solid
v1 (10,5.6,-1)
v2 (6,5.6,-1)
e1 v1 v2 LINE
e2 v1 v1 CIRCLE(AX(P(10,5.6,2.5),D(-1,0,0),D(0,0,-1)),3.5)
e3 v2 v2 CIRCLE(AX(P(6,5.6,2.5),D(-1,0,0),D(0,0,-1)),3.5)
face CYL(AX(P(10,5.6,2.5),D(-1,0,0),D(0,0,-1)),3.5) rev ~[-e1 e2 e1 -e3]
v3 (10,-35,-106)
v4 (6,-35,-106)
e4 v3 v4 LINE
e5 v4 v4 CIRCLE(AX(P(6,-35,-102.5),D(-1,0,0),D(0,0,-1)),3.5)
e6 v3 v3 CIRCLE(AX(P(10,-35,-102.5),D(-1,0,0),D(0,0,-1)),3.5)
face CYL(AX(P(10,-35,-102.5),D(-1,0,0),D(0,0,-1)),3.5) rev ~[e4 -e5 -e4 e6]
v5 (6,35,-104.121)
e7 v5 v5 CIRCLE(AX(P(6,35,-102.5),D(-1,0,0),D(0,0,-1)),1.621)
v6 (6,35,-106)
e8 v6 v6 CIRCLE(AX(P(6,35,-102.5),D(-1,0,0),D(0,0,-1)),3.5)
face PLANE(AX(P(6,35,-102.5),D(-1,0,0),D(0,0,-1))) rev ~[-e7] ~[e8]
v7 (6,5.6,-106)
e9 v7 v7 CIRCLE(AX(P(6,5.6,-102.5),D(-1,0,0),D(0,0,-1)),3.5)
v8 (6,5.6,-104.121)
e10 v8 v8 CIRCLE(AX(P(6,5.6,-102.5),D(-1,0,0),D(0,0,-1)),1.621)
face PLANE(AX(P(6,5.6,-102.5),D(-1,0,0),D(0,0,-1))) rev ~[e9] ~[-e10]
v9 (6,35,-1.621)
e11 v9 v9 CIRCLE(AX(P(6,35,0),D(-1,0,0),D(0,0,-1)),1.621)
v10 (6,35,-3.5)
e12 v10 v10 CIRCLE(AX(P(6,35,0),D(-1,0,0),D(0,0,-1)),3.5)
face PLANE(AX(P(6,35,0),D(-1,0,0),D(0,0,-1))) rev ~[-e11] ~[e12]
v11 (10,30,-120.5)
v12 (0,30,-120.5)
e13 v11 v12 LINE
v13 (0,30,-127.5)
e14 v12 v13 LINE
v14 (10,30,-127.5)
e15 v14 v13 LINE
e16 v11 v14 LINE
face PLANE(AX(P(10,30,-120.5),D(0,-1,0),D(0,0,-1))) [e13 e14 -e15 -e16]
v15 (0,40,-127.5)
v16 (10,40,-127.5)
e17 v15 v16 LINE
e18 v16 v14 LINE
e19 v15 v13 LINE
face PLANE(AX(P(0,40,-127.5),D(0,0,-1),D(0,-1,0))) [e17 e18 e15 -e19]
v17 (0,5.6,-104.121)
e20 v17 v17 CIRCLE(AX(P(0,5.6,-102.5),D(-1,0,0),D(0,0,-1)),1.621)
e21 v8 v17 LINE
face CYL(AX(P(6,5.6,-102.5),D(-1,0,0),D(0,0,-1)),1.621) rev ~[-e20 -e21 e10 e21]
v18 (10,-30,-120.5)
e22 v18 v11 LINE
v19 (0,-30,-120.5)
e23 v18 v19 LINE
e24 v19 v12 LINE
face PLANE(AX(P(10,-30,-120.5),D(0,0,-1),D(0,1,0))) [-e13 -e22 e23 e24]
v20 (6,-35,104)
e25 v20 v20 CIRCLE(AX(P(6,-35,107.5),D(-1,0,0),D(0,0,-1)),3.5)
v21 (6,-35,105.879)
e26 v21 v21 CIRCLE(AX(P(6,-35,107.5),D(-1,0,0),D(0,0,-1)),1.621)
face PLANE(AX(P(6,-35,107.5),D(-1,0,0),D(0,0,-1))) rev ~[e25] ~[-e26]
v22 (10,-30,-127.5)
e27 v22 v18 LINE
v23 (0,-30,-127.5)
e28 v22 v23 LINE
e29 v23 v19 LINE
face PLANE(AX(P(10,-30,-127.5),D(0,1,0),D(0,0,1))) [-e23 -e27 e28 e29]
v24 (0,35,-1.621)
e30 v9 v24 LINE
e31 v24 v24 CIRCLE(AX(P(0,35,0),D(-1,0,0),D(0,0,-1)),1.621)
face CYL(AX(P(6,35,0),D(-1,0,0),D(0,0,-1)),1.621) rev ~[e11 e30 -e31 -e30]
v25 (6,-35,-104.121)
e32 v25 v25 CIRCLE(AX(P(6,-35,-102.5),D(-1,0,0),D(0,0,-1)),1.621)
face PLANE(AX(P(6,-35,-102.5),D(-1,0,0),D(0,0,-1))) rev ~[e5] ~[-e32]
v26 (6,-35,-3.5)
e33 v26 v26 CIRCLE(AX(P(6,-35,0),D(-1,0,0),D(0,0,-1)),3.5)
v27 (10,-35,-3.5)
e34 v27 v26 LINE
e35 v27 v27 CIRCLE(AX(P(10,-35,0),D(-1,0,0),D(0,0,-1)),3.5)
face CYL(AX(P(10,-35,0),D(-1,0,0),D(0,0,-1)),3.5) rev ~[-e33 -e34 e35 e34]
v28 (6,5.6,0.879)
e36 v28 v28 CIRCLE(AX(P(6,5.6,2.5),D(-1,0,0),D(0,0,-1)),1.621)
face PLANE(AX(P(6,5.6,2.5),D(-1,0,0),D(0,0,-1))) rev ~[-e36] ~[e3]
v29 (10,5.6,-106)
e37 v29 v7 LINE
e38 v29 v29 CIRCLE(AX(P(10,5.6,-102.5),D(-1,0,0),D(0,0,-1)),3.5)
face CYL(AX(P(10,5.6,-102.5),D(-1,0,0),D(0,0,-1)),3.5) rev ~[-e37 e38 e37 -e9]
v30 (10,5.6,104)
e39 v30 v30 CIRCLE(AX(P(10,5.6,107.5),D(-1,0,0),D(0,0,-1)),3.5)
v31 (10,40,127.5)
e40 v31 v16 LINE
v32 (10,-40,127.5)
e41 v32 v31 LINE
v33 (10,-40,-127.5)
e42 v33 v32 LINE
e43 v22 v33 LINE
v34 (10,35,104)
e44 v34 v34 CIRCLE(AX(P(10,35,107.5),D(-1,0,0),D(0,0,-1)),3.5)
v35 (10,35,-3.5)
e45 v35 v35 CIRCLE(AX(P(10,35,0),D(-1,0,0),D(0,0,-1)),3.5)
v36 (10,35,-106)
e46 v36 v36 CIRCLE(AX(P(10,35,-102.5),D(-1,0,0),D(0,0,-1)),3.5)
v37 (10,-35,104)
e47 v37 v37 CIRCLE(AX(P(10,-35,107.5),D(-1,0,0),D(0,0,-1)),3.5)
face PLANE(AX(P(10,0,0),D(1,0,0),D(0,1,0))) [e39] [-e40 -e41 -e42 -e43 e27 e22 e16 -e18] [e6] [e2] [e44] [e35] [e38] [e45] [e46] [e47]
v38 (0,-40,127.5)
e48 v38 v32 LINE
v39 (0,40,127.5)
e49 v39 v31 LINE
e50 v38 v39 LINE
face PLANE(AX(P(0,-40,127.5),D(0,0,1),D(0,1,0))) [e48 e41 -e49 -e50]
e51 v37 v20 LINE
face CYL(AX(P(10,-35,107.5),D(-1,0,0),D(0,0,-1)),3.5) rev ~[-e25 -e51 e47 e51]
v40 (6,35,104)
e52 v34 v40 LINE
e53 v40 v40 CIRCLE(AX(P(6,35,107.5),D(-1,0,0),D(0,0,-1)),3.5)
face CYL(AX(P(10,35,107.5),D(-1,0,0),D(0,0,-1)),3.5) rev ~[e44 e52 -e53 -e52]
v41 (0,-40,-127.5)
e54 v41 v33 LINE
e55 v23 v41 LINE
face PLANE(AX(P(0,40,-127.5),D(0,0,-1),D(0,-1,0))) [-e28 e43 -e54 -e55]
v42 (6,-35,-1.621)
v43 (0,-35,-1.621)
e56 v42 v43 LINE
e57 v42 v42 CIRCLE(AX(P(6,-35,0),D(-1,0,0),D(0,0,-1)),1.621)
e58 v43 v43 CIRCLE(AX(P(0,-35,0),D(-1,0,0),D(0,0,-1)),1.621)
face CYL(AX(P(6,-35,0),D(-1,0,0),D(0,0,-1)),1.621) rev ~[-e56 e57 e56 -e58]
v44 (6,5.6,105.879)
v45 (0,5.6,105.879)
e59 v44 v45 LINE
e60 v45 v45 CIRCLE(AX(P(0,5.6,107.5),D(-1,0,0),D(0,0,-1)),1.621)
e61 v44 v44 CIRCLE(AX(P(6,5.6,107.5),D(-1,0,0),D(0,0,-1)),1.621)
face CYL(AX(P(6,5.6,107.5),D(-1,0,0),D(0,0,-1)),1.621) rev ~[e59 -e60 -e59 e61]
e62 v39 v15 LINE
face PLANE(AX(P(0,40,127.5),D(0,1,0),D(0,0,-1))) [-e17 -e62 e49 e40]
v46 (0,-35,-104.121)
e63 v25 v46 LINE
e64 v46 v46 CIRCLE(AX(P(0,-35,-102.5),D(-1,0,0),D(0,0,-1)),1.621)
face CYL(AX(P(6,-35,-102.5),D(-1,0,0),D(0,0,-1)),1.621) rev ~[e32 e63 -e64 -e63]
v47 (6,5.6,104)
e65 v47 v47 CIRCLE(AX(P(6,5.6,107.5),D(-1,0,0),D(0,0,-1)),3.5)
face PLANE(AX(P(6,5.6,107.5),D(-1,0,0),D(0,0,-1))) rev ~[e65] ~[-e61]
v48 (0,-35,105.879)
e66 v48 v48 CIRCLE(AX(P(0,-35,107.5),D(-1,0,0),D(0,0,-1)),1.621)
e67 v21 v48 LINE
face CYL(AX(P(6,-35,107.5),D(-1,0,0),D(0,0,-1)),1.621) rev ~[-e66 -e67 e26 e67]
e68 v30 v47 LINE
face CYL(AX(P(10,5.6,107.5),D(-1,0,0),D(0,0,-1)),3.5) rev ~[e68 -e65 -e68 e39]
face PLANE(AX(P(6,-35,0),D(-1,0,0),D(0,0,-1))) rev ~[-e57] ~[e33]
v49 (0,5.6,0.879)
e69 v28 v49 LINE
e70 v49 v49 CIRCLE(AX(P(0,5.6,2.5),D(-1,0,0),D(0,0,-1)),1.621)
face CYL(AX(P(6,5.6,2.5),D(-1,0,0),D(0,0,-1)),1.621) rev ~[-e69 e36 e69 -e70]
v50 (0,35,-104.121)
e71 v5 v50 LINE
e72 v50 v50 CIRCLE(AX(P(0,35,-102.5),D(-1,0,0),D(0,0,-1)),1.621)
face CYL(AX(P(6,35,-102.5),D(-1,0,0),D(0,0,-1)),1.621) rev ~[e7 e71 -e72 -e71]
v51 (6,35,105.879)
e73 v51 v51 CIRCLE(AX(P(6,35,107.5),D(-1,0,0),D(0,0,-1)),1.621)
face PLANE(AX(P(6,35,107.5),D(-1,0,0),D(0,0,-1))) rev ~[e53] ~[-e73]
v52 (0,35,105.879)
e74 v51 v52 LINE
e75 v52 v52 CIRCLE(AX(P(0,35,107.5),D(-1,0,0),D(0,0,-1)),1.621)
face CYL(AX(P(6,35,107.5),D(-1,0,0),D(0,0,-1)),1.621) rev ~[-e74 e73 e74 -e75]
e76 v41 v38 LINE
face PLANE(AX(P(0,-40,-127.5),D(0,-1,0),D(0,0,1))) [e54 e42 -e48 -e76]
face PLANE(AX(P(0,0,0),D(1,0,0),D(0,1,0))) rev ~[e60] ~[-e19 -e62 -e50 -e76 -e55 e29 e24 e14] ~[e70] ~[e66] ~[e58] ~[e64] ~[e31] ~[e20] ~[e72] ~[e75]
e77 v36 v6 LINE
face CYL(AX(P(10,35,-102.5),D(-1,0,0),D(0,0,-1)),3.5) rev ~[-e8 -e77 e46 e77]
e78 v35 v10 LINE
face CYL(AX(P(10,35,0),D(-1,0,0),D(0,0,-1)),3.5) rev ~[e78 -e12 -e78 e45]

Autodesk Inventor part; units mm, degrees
ref_plane "YZ Plane" through (0, 0, 0) normal (1, 0, 0) x (0, 1, 0)
ref_plane "XZ Plane" through (0, 0, 0) normal (0, 1, 0) x (-1, 0, 0)
ref_plane "XY Plane" through (0, 0, 0) normal (0, 0, 1) x (1, 0, 0)
sketch "Skizze1" plane through (0, 0, 0) normal (1, 0, 0) x (0, 1, 0)
  line L0 (-40, 127.5) -> (40, 127.5)
  line L1 (40, 127.5) -> (40, -127.5)
  line L2 (40, -127.5) -> (-40, -127.5)
  line L3 (-40, -127.5) -> (-40, 127.5)
  line L4 (-40, 127.5) -> (40, -127.5) construction
  line L5 (40, 127.5) -> (-40, -127.5) construction
  point P0 (0, 0)
  dimension "d0" = 80
  dimension "d1" = 255
extrude "Extrusion1" add sketch "Skizze1" along normal blind 10
sketch "Skizze2" plane through (10, 0, 0) normal (1, 0, 0) x (0, 0, -1)
  line L0 (-127.5, 40) -> (-127.5, -40) projected
  line L1 (127.5, -40) -> (127.5, 40) projected
  line L2 (127.5, 40) -> (-127.5, 40) projected
  line L3 (-127.5, -35) -> (127.5, -35) construction
  line L4 (-127.5, -40) -> (127.5, -40) projected
  line L5 (178.5, 0) -> (-178.5, 0) projected
  point P0 (0, 0)
  point P1 (-107.5, 5.6)
  point P2 (-2.5, 5.6)
  point P3 (102.5, 5.6)
  point P4 (-107.5, -35)
  point P5 (0, -35)
  point P6 (102.5, -35)
  point P7 (-107.5, 35)
  point P8 (0, 35)
  point P9 (102.5, 35)
  dimension "d4" = 20
  dimension "d5" = 25
  dimension "d6" = 105
  dimension "d7" = 34.4
  dimension "d8" = 34.4
  dimension "d9" = 34.4
  dimension "d27" = 5
hole "Bohrung1" at (10, 5.6, 107.5) at (10, 5.6, 2.5) at (10, 5.6, -102.5) at (10, -35, 107.5) at (10, -35, 0) at (10, -35, -102.5) at (10, 35, -102.5) at (10, 35, 0) at (10, 35, 107.5) direction (-1, 0, 0) diameter 3.242 end through all counterbore diameter 7 counterbore depth 4 thread size "M4x0.7" class "6H" standard "ISO Metric profile"
sketch "Skizze5" plane through (10, 0, 0) normal (1, 0, 0) x (0, 0, -1)
  line L0 (127.5, -40) -> (127.5, 40) projected
  line L1 (127.5, -30) -> (120.5, -30)
  line L2 (120.5, -30) -> (120.5, 30)
  line L3 (120.5, 30) -> (127.5, 30)
  line L4 (127.5, 30) -> (127.5, -30)
  line L5 (-127.5, -40) -> (127.5, -40) projected
  point P0 (0, 0)
  point P1 (124, -30)
  point P2 (124, 30)
  dimension "d28" = 7
  dimension "d29" = 60
  dimension "d30" = 10
extrude "Extrusion2" cut sketch "Skizze5" against normal blind 10
equation "\"d8\" = d7"
equation "\"d9\" = d7"
properties part number "ER_Wand_1"
